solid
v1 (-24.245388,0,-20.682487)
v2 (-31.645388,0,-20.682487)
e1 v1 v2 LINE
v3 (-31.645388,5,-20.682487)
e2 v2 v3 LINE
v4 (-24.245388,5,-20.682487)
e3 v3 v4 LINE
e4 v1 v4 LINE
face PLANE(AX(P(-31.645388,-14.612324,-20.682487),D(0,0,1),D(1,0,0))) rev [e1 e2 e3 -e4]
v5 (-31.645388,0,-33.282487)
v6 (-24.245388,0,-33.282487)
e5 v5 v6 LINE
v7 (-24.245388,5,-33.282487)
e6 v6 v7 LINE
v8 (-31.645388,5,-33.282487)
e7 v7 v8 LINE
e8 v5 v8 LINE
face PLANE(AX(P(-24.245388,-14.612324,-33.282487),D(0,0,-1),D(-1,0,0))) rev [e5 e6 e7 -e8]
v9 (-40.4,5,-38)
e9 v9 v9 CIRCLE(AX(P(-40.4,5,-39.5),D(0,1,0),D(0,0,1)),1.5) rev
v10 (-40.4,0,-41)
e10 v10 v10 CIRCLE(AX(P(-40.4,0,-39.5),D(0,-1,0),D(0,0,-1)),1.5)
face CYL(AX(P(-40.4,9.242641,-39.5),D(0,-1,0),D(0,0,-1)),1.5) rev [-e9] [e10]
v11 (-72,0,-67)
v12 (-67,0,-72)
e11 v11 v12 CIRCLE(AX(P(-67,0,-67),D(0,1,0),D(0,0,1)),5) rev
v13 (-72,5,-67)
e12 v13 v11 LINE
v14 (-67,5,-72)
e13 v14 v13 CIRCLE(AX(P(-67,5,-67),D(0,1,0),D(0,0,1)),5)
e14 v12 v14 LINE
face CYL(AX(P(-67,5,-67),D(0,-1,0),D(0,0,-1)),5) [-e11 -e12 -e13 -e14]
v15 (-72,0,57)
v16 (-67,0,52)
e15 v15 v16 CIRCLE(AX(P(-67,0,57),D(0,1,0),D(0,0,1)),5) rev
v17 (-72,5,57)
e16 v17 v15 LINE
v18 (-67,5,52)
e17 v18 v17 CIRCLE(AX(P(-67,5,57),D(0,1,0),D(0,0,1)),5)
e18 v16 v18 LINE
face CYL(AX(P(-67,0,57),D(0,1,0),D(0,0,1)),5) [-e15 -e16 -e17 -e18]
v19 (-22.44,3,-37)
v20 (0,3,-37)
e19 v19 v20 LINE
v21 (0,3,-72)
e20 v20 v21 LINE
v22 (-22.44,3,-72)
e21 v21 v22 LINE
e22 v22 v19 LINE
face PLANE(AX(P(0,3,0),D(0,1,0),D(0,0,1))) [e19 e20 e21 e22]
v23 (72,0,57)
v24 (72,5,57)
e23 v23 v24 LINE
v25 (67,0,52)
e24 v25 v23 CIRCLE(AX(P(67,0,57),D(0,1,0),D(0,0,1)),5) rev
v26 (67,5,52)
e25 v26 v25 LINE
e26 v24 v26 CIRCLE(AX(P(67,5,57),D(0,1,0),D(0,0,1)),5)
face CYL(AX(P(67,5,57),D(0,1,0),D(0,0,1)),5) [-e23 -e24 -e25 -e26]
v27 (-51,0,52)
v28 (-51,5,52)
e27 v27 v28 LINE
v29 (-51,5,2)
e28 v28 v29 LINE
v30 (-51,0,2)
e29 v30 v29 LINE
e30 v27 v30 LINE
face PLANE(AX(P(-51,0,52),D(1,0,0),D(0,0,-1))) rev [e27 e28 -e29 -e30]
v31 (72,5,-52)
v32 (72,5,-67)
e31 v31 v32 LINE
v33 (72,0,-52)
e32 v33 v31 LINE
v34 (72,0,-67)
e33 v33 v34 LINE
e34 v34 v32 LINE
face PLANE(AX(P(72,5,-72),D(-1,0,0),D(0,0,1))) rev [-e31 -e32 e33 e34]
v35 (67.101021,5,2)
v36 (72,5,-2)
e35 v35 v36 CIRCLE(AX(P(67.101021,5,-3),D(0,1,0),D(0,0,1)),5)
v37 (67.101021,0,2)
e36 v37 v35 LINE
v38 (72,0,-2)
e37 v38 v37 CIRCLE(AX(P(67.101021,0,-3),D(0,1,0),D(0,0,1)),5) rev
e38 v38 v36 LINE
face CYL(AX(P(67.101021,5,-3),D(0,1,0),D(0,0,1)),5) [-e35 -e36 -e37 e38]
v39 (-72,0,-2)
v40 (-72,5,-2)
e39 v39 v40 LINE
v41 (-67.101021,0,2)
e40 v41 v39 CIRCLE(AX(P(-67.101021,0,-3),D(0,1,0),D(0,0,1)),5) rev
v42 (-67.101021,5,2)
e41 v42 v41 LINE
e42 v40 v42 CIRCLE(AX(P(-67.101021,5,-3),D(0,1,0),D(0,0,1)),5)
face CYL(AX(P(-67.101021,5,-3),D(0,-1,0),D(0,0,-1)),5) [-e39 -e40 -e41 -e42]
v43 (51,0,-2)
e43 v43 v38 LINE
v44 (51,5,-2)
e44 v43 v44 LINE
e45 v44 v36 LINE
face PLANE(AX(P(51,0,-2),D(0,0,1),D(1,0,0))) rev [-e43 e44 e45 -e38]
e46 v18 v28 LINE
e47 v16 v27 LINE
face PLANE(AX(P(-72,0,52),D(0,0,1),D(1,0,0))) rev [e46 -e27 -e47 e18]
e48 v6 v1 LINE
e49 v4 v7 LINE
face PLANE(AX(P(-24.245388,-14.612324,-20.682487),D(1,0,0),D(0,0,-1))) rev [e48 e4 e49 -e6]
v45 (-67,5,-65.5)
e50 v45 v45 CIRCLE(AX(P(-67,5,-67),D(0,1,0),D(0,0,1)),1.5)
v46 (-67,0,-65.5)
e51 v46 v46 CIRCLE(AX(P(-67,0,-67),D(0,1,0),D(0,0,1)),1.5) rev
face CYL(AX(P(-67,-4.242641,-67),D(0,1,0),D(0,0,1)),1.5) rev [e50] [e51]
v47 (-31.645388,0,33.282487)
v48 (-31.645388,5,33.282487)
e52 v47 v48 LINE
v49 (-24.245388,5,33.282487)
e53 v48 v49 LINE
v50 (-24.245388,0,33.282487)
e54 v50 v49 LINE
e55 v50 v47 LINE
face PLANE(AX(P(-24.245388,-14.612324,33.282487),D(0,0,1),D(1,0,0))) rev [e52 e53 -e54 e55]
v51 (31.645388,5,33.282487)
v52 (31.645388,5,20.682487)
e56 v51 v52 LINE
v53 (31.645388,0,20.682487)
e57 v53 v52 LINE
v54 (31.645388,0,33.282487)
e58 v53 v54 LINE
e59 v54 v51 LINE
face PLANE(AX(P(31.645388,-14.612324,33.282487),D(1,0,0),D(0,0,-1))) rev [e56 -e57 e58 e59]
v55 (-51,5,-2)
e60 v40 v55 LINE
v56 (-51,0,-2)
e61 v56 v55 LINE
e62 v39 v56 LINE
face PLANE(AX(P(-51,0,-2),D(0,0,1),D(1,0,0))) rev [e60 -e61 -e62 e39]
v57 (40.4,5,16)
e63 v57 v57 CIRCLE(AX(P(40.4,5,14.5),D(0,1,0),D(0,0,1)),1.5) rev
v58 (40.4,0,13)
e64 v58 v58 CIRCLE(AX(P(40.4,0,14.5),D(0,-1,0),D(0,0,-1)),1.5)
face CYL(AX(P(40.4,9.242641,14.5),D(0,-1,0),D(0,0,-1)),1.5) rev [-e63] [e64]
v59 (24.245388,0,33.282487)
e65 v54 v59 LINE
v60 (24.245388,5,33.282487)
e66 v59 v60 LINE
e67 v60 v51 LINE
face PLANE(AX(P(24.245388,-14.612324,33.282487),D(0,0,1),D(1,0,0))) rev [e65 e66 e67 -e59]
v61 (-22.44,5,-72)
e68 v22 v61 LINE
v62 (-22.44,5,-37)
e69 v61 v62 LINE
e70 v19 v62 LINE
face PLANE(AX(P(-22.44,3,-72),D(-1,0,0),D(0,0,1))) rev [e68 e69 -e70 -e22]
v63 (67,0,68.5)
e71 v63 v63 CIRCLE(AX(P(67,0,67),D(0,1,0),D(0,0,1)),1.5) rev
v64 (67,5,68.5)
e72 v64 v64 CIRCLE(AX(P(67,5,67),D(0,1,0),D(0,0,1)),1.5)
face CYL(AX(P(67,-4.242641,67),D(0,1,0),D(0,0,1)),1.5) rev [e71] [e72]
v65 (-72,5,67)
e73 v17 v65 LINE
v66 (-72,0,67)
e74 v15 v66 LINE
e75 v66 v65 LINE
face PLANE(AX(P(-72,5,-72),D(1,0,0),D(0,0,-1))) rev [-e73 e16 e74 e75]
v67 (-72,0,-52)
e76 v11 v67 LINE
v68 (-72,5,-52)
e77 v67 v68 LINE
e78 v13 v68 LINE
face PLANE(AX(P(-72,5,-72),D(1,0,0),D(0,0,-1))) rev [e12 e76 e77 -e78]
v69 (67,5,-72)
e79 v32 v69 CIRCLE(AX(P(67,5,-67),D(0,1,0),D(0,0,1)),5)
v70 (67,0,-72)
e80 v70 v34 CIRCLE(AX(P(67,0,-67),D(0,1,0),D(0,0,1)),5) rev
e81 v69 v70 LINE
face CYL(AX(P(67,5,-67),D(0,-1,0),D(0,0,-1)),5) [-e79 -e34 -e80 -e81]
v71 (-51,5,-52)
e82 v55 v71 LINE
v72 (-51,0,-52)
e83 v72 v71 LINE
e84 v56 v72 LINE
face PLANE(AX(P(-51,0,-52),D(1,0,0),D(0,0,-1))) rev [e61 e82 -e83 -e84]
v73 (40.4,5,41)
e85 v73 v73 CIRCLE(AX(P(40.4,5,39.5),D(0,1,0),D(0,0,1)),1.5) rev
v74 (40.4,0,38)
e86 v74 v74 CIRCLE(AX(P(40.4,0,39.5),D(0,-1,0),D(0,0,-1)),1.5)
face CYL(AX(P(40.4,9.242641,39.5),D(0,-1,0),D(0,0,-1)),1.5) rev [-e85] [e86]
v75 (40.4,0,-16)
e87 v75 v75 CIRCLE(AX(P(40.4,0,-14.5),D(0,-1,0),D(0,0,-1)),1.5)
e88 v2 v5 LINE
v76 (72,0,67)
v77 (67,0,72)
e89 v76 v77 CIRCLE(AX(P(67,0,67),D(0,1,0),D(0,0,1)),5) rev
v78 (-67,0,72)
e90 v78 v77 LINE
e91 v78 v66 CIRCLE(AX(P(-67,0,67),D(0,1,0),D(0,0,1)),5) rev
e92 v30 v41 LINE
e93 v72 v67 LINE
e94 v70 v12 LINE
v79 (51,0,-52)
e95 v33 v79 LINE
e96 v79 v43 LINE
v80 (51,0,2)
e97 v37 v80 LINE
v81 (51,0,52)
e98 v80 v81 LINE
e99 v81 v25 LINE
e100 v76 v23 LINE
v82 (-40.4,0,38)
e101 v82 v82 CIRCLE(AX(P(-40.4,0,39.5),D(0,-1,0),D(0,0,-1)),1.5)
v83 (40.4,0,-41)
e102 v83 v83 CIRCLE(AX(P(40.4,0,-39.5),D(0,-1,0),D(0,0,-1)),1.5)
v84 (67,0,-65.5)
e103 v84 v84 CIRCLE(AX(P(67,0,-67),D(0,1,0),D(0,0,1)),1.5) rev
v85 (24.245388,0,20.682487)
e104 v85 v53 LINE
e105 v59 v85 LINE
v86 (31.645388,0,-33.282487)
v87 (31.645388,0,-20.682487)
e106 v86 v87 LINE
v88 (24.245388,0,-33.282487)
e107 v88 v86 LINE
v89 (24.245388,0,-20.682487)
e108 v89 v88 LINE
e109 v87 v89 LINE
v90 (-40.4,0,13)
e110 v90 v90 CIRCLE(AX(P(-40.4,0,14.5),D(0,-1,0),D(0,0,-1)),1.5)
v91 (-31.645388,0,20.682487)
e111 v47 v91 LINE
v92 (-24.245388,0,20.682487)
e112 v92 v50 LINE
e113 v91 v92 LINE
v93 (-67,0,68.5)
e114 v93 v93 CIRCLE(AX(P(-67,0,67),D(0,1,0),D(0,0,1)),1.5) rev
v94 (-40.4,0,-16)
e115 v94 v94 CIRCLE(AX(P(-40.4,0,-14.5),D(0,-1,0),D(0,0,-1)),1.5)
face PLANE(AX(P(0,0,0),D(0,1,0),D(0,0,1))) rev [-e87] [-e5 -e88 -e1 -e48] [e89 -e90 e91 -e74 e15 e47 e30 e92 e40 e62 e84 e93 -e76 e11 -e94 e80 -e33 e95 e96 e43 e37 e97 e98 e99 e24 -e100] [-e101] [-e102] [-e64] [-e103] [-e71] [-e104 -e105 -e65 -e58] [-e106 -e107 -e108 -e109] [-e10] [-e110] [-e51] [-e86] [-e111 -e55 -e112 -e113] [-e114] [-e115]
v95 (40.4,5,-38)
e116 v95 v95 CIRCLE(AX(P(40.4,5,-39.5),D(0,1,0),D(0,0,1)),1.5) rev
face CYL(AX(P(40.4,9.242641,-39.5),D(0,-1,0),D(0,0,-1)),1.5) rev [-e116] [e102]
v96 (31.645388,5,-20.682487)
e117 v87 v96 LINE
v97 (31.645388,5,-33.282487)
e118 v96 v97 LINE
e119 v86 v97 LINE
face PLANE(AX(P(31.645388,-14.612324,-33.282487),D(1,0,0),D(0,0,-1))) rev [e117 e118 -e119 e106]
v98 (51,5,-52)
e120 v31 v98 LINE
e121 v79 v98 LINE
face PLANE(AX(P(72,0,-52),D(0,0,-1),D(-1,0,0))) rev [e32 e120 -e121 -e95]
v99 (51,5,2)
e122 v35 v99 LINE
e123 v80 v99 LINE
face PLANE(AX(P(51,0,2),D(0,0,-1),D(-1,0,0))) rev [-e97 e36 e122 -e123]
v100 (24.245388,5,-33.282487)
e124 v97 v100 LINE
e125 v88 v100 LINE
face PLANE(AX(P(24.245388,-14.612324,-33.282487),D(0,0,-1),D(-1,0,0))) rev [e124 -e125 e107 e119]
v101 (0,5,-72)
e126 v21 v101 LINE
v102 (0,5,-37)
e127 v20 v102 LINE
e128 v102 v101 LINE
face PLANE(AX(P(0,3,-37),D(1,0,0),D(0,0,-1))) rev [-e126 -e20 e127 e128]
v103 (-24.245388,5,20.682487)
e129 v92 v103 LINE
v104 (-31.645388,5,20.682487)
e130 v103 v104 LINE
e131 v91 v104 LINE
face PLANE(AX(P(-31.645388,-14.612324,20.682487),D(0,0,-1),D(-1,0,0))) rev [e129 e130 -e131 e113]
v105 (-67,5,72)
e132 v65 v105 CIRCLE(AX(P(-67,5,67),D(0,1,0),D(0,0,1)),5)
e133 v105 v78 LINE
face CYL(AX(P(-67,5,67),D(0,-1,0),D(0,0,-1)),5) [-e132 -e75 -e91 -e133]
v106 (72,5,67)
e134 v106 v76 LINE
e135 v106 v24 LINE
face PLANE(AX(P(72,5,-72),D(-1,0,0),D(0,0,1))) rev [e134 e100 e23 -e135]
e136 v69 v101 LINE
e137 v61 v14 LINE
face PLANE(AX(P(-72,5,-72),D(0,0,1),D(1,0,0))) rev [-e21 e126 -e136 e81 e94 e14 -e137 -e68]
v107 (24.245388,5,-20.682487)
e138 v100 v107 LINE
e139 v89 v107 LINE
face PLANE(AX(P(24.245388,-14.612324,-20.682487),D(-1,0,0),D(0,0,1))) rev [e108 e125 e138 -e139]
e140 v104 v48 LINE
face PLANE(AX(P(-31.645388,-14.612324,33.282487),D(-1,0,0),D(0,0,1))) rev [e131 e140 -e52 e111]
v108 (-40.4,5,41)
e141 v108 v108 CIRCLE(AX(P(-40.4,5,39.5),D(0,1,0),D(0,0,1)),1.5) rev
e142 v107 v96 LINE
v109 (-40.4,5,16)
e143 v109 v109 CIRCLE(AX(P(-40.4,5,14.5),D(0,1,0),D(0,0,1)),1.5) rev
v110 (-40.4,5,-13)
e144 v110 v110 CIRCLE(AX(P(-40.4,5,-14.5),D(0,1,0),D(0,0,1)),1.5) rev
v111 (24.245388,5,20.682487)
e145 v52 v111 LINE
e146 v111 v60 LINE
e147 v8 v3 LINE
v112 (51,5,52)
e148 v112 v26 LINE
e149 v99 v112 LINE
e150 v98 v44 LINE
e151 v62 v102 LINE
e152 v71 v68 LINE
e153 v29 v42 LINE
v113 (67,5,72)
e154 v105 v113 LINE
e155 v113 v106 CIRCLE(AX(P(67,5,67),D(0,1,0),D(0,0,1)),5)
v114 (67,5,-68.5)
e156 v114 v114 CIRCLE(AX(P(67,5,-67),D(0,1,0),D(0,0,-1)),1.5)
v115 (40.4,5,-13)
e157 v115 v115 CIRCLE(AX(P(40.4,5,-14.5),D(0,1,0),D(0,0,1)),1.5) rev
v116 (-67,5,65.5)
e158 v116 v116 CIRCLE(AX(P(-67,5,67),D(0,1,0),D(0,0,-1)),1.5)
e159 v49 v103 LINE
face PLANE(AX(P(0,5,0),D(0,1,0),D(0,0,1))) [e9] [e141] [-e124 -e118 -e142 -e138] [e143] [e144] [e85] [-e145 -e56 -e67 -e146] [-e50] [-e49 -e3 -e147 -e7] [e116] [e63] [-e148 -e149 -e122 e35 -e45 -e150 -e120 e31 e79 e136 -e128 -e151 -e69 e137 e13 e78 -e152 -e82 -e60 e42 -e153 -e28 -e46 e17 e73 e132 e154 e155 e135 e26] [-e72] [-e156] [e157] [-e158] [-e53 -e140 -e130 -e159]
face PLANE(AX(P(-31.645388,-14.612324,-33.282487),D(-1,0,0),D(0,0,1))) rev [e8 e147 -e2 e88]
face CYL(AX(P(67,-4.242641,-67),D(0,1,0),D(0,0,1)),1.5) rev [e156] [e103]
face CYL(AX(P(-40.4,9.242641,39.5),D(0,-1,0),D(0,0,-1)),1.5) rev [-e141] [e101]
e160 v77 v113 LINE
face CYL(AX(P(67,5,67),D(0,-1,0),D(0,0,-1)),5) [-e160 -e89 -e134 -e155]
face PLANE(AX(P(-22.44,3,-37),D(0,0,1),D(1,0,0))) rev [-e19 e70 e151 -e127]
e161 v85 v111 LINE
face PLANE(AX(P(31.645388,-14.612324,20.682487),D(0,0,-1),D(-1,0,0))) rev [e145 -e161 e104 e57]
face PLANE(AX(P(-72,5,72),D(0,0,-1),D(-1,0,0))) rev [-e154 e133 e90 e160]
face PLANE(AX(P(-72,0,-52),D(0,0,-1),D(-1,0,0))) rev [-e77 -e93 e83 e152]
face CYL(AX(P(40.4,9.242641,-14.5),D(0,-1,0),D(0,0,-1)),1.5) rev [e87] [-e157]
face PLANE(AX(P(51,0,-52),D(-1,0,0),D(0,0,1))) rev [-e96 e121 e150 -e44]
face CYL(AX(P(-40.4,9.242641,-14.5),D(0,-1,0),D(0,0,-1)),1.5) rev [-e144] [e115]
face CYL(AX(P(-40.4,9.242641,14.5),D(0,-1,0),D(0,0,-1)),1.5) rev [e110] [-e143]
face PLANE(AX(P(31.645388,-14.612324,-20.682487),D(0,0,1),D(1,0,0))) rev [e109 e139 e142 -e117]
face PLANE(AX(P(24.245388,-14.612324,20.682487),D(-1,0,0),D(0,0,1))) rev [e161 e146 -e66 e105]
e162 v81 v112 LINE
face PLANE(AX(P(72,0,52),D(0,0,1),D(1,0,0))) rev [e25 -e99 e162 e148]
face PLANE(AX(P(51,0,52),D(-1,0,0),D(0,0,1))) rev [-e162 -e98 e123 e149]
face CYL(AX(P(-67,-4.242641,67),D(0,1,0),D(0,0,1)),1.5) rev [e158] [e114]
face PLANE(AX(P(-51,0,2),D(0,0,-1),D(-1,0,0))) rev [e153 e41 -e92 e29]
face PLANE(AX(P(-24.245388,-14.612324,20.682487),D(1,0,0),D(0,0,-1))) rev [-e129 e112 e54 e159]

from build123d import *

# Parameters (mm, degrees)
SKETCH1_W           = 144
SKETCH1_H           = 144
BOSS_EXTRUDE1_DEPTH = 5
SKETCH2_W           = 21
SKETCH2_H           = 50
CUT_EXTRUDE1_DEPTH  = 5
SKETCH11_W          = 7.4
SKETCH11_H          = 12.6
CUT_EXTRUDE10_DEPTH = 5
SKETCH13_R          = 1.5
CUT_EXTRUDE12_DEPTH = 5
FILLET1_R           = 5
FILLET2_R           = 5
FILLET3_R           = 5
SKETCH14_R          = 1.5
CUT_EXTRUDE13_DEPTH = 5
SKETCH15_W          = 22.44
SKETCH15_H          = 35
CUT_EXTRUDE14_DEPTH = 2


with BuildPart() as part:
    # Sketch1 → Boss-Extrude1 (new body)
    with BuildSketch(Plane(origin=(0, 0, 0), x_dir=(1, 0, 0), z_dir=(0, 1, 0))):
        Rectangle(SKETCH1_W, SKETCH1_H)
    extrude(amount=BOSS_EXTRUDE1_DEPTH)

    # Sketch2 → Cut-Extrude1 (cut)
    with BuildSketch(Plane(origin=(0, 5, 0), x_dir=(1, 0, 0), z_dir=(0, 1, 0))):
        with Locations((-61.5, -27)):
            Rectangle(SKETCH2_W, SKETCH2_H)
        with Locations((61.5, -27)):
            Rectangle(SKETCH2_W, SKETCH2_H)
        with Locations((61.5, 27)):
            Rectangle(SKETCH2_W, SKETCH2_H)
        with Locations((-61.5, 27)):
            Rectangle(SKETCH2_W, SKETCH2_H)
    extrude(amount=-CUT_EXTRUDE1_DEPTH, mode=Mode.SUBTRACT)

    # Sketch11 → Cut-Extrude10 (cut)
    with BuildSketch(Plane(origin=(0, 5, 0), x_dir=(1, 0, 0), z_dir=(0, 1, 0))):
        with Locations((27.945388191, -26.98248673)):
            Rectangle(SKETCH11_W, SKETCH11_H)
        with Locations((-27.945388191, -26.98248673)):
            Rectangle(SKETCH11_W, SKETCH11_H)
        with Locations((27.945388191, 26.98248673)):
            Rectangle(SKETCH11_W, SKETCH11_H)
        with Locations((-27.945388191, 26.98248673)):
            Rectangle(SKETCH11_W, SKETCH11_H)
    extrude(amount=-CUT_EXTRUDE10_DEPTH, mode=Mode.SUBTRACT)

    # Sketch13 → Cut-Extrude12 (cut)
    with BuildSketch(Plane(origin=(0, 5, 0), x_dir=(1, 0, 0), z_dir=(0, 1, 0))):
        with Locations(Location((-67, 67, 0), (0, 0, 270))):
            Circle(SKETCH13_R)
        with Locations(Location((-67, -67, 0), (0, 0, 270))):
            Circle(SKETCH13_R)
        with Locations(Location((67, 67, 0), (0, 0, 270))):
            Circle(SKETCH13_R)
        with Locations(Location((67, -67, 0), (0, 0, 270))):
            Circle(SKETCH13_R)
    extrude(amount=-CUT_EXTRUDE12_DEPTH, mode=Mode.SUBTRACT)

    # Fillet1
    fillet1_edges = [part.edges().sort_by_distance(p)[0] for p in [
        (-72, 2.5, -72),
    ]]
    fillet(fillet1_edges, radius=FILLET1_R)

    # Fillet2
    # the kernel refuses this fillet: 5 mm, written as the material it takes off along each edge
    with BuildSketch(Plane(origin=(-72, 17.5, 52), x_dir=(1, 0, 0), z_dir=(0, -1, 0))) as fillet2_piece_1:
        with BuildLine():
            CenterArc((FILLET2_R, FILLET2_R), FILLET2_R, 180, 90)
            Line((0, FILLET2_R), (-FILLET2_R * 0.02, FILLET2_R))
            Line((-FILLET2_R * 0.02, FILLET2_R), (-FILLET2_R * 0.02, -FILLET2_R * 0.02))
            Line((-FILLET2_R * 0.02, -FILLET2_R * 0.02), (FILLET2_R, -FILLET2_R * 0.02))
            Line((FILLET2_R, -FILLET2_R * 0.02), (FILLET2_R, 0))
        make_face()
    extrude(amount=30, mode=Mode.SUBTRACT)
    with BuildSketch(Plane(origin=(-72, 17.247448714, 2), x_dir=(1.5631940186717212e-12, 0, -1.0), z_dir=(0, -1, 0))) as fillet2_piece_2:
        with BuildLine():
            CenterArc((5, 4.898979486), FILLET2_R, 180, 78.463040967)
            Line((0, 4.898979486), (-0.1, 4.898979486))
            Line((-0.1, 4.898979486), (-0.1, 0))
            Line((-0.1, 0), (0, -0.1))
            ThreePointArc((0, -0.1), (2, -0.1), (3.98, -0.09797959))
            Line((3.98, -0.09797959), (4, 0))
        make_face()
    extrude(amount=29.494897428, mode=Mode.SUBTRACT)
    with BuildSketch(Plane(origin=(-72, -12.5, 72), x_dir=(0, 0, -1), z_dir=(0, 1, 0))) as fillet2_piece_3:
        with BuildLine():
            CenterArc((FILLET2_R, -FILLET2_R), FILLET2_R, 90, 90)
            Line((0, -FILLET2_R), (-FILLET2_R * 0.02, -FILLET2_R))
            Line((-FILLET2_R * 0.02, -FILLET2_R), (-FILLET2_R * 0.02, FILLET2_R * 0.02))
            Line((-FILLET2_R * 0.02, FILLET2_R * 0.02), (FILLET2_R, FILLET2_R * 0.02))
            Line((FILLET2_R, FILLET2_R * 0.02), (FILLET2_R, 0))
        make_face()
    extrude(amount=30, mode=Mode.SUBTRACT)

    # Fillet3
    # the kernel refuses this fillet: 5 mm, written as the material it takes off along each edge
    with BuildSketch(Plane(origin=(72, 17.247448714, 2), x_dir=(-1, 0, 0), z_dir=(0, -1, 0))) as fillet3_piece_1:
        with BuildLine():
            CenterArc((4.898979486, 5), FILLET3_R, 191.536959033, 78.463040967)
            Line((0, 4), (-0.09797959, 3.98))
            ThreePointArc((-0.09797959, 3.98), (-0.1, 2), (-0.1, 0))
            Line((-0.1, 0), (0, -0.1))
            Line((0, -0.1), (4.898979486, -0.1))
            Line((4.898979486, -0.1), (4.898979486, 0))
        make_face()
    extrude(amount=29.494897428, mode=Mode.SUBTRACT)
    with BuildSketch(Plane(origin=(72, 17.5, 52), x_dir=(0, 0, 1), z_dir=(0, -1, 0)), Plane(origin=(72, -12.5, -72), x_dir=(-1, 0, 0), z_dir=(0, 1, 0))) as fillet3_piece_2:
        with BuildLine():
            CenterArc((FILLET3_R, FILLET3_R), FILLET3_R, 180, 90)
            Line((0, FILLET3_R), (-FILLET3_R * 0.02, FILLET3_R))
            Line((-FILLET3_R * 0.02, FILLET3_R), (-FILLET3_R * 0.02, -FILLET3_R * 0.02))
            Line((-FILLET3_R * 0.02, -FILLET3_R * 0.02), (FILLET3_R, -FILLET3_R * 0.02))
            Line((FILLET3_R, -FILLET3_R * 0.02), (FILLET3_R, 0))
        make_face()
    extrude(amount=30, mode=Mode.SUBTRACT)
    with BuildSketch(Plane(origin=(72, -12.5, 72), x_dir=(-1, 0, 0), z_dir=(0, 1, 0))) as fillet3_piece_3:
        with BuildLine():
            CenterArc((FILLET3_R, -FILLET3_R), FILLET3_R, 90, 90)
            Line((0, -FILLET3_R), (-FILLET3_R * 0.02, -FILLET3_R))
            Line((-FILLET3_R * 0.02, -FILLET3_R), (-FILLET3_R * 0.02, FILLET3_R * 0.02))
            Line((-FILLET3_R * 0.02, FILLET3_R * 0.02), (FILLET3_R, FILLET3_R * 0.02))
            Line((FILLET3_R, FILLET3_R * 0.02), (FILLET3_R, 0))
        make_face()
    extrude(amount=30, mode=Mode.SUBTRACT)

    # Sketch14 → Cut-Extrude13 (cut)
    with BuildSketch(Plane.XZ):
        with Locations(Location((-40.4, 39.5, 0), (0, 0, 270))):
            Circle(SKETCH14_R)
        with Locations(Location((-40.4, 14.5, 0), (0, 0, 270))):
            Circle(SKETCH14_R)
        with Locations(Location((40.4, 39.5, 0), (0, 0, 270))):
            Circle(SKETCH14_R)
        with Locations(Location((40.4, 14.5, 0), (0, 0, 270))):
            Circle(SKETCH14_R)
        with Locations(Location((-40.4, -14.5, 0), (0, 0, 270))):
            Circle(SKETCH14_R)
        with Locations(Location((-40.4, -39.5, 0), (0, 0, 270))):
            Circle(SKETCH14_R)
        with Locations(Location((40.4, -14.5, 0), (0, 0, 270))):
            Circle(SKETCH14_R)
        with Locations(Location((40.4, -39.5, 0), (0, 0, 270))):
            Circle(SKETCH14_R)
    extrude(amount=-CUT_EXTRUDE13_DEPTH, mode=Mode.SUBTRACT)

    # Sketch15 → Cut-Extrude14 (cut)
    with BuildSketch(Plane(origin=(0, 5, 0), x_dir=(1, 0, 0), z_dir=(0, 1, 0))):
        with Locations((-11.22, 54.5)):
            Rectangle(SKETCH15_W, SKETCH15_H)
    extrude(amount=-CUT_EXTRUDE14_DEPTH, mode=Mode.SUBTRACT)


solid = part.part
